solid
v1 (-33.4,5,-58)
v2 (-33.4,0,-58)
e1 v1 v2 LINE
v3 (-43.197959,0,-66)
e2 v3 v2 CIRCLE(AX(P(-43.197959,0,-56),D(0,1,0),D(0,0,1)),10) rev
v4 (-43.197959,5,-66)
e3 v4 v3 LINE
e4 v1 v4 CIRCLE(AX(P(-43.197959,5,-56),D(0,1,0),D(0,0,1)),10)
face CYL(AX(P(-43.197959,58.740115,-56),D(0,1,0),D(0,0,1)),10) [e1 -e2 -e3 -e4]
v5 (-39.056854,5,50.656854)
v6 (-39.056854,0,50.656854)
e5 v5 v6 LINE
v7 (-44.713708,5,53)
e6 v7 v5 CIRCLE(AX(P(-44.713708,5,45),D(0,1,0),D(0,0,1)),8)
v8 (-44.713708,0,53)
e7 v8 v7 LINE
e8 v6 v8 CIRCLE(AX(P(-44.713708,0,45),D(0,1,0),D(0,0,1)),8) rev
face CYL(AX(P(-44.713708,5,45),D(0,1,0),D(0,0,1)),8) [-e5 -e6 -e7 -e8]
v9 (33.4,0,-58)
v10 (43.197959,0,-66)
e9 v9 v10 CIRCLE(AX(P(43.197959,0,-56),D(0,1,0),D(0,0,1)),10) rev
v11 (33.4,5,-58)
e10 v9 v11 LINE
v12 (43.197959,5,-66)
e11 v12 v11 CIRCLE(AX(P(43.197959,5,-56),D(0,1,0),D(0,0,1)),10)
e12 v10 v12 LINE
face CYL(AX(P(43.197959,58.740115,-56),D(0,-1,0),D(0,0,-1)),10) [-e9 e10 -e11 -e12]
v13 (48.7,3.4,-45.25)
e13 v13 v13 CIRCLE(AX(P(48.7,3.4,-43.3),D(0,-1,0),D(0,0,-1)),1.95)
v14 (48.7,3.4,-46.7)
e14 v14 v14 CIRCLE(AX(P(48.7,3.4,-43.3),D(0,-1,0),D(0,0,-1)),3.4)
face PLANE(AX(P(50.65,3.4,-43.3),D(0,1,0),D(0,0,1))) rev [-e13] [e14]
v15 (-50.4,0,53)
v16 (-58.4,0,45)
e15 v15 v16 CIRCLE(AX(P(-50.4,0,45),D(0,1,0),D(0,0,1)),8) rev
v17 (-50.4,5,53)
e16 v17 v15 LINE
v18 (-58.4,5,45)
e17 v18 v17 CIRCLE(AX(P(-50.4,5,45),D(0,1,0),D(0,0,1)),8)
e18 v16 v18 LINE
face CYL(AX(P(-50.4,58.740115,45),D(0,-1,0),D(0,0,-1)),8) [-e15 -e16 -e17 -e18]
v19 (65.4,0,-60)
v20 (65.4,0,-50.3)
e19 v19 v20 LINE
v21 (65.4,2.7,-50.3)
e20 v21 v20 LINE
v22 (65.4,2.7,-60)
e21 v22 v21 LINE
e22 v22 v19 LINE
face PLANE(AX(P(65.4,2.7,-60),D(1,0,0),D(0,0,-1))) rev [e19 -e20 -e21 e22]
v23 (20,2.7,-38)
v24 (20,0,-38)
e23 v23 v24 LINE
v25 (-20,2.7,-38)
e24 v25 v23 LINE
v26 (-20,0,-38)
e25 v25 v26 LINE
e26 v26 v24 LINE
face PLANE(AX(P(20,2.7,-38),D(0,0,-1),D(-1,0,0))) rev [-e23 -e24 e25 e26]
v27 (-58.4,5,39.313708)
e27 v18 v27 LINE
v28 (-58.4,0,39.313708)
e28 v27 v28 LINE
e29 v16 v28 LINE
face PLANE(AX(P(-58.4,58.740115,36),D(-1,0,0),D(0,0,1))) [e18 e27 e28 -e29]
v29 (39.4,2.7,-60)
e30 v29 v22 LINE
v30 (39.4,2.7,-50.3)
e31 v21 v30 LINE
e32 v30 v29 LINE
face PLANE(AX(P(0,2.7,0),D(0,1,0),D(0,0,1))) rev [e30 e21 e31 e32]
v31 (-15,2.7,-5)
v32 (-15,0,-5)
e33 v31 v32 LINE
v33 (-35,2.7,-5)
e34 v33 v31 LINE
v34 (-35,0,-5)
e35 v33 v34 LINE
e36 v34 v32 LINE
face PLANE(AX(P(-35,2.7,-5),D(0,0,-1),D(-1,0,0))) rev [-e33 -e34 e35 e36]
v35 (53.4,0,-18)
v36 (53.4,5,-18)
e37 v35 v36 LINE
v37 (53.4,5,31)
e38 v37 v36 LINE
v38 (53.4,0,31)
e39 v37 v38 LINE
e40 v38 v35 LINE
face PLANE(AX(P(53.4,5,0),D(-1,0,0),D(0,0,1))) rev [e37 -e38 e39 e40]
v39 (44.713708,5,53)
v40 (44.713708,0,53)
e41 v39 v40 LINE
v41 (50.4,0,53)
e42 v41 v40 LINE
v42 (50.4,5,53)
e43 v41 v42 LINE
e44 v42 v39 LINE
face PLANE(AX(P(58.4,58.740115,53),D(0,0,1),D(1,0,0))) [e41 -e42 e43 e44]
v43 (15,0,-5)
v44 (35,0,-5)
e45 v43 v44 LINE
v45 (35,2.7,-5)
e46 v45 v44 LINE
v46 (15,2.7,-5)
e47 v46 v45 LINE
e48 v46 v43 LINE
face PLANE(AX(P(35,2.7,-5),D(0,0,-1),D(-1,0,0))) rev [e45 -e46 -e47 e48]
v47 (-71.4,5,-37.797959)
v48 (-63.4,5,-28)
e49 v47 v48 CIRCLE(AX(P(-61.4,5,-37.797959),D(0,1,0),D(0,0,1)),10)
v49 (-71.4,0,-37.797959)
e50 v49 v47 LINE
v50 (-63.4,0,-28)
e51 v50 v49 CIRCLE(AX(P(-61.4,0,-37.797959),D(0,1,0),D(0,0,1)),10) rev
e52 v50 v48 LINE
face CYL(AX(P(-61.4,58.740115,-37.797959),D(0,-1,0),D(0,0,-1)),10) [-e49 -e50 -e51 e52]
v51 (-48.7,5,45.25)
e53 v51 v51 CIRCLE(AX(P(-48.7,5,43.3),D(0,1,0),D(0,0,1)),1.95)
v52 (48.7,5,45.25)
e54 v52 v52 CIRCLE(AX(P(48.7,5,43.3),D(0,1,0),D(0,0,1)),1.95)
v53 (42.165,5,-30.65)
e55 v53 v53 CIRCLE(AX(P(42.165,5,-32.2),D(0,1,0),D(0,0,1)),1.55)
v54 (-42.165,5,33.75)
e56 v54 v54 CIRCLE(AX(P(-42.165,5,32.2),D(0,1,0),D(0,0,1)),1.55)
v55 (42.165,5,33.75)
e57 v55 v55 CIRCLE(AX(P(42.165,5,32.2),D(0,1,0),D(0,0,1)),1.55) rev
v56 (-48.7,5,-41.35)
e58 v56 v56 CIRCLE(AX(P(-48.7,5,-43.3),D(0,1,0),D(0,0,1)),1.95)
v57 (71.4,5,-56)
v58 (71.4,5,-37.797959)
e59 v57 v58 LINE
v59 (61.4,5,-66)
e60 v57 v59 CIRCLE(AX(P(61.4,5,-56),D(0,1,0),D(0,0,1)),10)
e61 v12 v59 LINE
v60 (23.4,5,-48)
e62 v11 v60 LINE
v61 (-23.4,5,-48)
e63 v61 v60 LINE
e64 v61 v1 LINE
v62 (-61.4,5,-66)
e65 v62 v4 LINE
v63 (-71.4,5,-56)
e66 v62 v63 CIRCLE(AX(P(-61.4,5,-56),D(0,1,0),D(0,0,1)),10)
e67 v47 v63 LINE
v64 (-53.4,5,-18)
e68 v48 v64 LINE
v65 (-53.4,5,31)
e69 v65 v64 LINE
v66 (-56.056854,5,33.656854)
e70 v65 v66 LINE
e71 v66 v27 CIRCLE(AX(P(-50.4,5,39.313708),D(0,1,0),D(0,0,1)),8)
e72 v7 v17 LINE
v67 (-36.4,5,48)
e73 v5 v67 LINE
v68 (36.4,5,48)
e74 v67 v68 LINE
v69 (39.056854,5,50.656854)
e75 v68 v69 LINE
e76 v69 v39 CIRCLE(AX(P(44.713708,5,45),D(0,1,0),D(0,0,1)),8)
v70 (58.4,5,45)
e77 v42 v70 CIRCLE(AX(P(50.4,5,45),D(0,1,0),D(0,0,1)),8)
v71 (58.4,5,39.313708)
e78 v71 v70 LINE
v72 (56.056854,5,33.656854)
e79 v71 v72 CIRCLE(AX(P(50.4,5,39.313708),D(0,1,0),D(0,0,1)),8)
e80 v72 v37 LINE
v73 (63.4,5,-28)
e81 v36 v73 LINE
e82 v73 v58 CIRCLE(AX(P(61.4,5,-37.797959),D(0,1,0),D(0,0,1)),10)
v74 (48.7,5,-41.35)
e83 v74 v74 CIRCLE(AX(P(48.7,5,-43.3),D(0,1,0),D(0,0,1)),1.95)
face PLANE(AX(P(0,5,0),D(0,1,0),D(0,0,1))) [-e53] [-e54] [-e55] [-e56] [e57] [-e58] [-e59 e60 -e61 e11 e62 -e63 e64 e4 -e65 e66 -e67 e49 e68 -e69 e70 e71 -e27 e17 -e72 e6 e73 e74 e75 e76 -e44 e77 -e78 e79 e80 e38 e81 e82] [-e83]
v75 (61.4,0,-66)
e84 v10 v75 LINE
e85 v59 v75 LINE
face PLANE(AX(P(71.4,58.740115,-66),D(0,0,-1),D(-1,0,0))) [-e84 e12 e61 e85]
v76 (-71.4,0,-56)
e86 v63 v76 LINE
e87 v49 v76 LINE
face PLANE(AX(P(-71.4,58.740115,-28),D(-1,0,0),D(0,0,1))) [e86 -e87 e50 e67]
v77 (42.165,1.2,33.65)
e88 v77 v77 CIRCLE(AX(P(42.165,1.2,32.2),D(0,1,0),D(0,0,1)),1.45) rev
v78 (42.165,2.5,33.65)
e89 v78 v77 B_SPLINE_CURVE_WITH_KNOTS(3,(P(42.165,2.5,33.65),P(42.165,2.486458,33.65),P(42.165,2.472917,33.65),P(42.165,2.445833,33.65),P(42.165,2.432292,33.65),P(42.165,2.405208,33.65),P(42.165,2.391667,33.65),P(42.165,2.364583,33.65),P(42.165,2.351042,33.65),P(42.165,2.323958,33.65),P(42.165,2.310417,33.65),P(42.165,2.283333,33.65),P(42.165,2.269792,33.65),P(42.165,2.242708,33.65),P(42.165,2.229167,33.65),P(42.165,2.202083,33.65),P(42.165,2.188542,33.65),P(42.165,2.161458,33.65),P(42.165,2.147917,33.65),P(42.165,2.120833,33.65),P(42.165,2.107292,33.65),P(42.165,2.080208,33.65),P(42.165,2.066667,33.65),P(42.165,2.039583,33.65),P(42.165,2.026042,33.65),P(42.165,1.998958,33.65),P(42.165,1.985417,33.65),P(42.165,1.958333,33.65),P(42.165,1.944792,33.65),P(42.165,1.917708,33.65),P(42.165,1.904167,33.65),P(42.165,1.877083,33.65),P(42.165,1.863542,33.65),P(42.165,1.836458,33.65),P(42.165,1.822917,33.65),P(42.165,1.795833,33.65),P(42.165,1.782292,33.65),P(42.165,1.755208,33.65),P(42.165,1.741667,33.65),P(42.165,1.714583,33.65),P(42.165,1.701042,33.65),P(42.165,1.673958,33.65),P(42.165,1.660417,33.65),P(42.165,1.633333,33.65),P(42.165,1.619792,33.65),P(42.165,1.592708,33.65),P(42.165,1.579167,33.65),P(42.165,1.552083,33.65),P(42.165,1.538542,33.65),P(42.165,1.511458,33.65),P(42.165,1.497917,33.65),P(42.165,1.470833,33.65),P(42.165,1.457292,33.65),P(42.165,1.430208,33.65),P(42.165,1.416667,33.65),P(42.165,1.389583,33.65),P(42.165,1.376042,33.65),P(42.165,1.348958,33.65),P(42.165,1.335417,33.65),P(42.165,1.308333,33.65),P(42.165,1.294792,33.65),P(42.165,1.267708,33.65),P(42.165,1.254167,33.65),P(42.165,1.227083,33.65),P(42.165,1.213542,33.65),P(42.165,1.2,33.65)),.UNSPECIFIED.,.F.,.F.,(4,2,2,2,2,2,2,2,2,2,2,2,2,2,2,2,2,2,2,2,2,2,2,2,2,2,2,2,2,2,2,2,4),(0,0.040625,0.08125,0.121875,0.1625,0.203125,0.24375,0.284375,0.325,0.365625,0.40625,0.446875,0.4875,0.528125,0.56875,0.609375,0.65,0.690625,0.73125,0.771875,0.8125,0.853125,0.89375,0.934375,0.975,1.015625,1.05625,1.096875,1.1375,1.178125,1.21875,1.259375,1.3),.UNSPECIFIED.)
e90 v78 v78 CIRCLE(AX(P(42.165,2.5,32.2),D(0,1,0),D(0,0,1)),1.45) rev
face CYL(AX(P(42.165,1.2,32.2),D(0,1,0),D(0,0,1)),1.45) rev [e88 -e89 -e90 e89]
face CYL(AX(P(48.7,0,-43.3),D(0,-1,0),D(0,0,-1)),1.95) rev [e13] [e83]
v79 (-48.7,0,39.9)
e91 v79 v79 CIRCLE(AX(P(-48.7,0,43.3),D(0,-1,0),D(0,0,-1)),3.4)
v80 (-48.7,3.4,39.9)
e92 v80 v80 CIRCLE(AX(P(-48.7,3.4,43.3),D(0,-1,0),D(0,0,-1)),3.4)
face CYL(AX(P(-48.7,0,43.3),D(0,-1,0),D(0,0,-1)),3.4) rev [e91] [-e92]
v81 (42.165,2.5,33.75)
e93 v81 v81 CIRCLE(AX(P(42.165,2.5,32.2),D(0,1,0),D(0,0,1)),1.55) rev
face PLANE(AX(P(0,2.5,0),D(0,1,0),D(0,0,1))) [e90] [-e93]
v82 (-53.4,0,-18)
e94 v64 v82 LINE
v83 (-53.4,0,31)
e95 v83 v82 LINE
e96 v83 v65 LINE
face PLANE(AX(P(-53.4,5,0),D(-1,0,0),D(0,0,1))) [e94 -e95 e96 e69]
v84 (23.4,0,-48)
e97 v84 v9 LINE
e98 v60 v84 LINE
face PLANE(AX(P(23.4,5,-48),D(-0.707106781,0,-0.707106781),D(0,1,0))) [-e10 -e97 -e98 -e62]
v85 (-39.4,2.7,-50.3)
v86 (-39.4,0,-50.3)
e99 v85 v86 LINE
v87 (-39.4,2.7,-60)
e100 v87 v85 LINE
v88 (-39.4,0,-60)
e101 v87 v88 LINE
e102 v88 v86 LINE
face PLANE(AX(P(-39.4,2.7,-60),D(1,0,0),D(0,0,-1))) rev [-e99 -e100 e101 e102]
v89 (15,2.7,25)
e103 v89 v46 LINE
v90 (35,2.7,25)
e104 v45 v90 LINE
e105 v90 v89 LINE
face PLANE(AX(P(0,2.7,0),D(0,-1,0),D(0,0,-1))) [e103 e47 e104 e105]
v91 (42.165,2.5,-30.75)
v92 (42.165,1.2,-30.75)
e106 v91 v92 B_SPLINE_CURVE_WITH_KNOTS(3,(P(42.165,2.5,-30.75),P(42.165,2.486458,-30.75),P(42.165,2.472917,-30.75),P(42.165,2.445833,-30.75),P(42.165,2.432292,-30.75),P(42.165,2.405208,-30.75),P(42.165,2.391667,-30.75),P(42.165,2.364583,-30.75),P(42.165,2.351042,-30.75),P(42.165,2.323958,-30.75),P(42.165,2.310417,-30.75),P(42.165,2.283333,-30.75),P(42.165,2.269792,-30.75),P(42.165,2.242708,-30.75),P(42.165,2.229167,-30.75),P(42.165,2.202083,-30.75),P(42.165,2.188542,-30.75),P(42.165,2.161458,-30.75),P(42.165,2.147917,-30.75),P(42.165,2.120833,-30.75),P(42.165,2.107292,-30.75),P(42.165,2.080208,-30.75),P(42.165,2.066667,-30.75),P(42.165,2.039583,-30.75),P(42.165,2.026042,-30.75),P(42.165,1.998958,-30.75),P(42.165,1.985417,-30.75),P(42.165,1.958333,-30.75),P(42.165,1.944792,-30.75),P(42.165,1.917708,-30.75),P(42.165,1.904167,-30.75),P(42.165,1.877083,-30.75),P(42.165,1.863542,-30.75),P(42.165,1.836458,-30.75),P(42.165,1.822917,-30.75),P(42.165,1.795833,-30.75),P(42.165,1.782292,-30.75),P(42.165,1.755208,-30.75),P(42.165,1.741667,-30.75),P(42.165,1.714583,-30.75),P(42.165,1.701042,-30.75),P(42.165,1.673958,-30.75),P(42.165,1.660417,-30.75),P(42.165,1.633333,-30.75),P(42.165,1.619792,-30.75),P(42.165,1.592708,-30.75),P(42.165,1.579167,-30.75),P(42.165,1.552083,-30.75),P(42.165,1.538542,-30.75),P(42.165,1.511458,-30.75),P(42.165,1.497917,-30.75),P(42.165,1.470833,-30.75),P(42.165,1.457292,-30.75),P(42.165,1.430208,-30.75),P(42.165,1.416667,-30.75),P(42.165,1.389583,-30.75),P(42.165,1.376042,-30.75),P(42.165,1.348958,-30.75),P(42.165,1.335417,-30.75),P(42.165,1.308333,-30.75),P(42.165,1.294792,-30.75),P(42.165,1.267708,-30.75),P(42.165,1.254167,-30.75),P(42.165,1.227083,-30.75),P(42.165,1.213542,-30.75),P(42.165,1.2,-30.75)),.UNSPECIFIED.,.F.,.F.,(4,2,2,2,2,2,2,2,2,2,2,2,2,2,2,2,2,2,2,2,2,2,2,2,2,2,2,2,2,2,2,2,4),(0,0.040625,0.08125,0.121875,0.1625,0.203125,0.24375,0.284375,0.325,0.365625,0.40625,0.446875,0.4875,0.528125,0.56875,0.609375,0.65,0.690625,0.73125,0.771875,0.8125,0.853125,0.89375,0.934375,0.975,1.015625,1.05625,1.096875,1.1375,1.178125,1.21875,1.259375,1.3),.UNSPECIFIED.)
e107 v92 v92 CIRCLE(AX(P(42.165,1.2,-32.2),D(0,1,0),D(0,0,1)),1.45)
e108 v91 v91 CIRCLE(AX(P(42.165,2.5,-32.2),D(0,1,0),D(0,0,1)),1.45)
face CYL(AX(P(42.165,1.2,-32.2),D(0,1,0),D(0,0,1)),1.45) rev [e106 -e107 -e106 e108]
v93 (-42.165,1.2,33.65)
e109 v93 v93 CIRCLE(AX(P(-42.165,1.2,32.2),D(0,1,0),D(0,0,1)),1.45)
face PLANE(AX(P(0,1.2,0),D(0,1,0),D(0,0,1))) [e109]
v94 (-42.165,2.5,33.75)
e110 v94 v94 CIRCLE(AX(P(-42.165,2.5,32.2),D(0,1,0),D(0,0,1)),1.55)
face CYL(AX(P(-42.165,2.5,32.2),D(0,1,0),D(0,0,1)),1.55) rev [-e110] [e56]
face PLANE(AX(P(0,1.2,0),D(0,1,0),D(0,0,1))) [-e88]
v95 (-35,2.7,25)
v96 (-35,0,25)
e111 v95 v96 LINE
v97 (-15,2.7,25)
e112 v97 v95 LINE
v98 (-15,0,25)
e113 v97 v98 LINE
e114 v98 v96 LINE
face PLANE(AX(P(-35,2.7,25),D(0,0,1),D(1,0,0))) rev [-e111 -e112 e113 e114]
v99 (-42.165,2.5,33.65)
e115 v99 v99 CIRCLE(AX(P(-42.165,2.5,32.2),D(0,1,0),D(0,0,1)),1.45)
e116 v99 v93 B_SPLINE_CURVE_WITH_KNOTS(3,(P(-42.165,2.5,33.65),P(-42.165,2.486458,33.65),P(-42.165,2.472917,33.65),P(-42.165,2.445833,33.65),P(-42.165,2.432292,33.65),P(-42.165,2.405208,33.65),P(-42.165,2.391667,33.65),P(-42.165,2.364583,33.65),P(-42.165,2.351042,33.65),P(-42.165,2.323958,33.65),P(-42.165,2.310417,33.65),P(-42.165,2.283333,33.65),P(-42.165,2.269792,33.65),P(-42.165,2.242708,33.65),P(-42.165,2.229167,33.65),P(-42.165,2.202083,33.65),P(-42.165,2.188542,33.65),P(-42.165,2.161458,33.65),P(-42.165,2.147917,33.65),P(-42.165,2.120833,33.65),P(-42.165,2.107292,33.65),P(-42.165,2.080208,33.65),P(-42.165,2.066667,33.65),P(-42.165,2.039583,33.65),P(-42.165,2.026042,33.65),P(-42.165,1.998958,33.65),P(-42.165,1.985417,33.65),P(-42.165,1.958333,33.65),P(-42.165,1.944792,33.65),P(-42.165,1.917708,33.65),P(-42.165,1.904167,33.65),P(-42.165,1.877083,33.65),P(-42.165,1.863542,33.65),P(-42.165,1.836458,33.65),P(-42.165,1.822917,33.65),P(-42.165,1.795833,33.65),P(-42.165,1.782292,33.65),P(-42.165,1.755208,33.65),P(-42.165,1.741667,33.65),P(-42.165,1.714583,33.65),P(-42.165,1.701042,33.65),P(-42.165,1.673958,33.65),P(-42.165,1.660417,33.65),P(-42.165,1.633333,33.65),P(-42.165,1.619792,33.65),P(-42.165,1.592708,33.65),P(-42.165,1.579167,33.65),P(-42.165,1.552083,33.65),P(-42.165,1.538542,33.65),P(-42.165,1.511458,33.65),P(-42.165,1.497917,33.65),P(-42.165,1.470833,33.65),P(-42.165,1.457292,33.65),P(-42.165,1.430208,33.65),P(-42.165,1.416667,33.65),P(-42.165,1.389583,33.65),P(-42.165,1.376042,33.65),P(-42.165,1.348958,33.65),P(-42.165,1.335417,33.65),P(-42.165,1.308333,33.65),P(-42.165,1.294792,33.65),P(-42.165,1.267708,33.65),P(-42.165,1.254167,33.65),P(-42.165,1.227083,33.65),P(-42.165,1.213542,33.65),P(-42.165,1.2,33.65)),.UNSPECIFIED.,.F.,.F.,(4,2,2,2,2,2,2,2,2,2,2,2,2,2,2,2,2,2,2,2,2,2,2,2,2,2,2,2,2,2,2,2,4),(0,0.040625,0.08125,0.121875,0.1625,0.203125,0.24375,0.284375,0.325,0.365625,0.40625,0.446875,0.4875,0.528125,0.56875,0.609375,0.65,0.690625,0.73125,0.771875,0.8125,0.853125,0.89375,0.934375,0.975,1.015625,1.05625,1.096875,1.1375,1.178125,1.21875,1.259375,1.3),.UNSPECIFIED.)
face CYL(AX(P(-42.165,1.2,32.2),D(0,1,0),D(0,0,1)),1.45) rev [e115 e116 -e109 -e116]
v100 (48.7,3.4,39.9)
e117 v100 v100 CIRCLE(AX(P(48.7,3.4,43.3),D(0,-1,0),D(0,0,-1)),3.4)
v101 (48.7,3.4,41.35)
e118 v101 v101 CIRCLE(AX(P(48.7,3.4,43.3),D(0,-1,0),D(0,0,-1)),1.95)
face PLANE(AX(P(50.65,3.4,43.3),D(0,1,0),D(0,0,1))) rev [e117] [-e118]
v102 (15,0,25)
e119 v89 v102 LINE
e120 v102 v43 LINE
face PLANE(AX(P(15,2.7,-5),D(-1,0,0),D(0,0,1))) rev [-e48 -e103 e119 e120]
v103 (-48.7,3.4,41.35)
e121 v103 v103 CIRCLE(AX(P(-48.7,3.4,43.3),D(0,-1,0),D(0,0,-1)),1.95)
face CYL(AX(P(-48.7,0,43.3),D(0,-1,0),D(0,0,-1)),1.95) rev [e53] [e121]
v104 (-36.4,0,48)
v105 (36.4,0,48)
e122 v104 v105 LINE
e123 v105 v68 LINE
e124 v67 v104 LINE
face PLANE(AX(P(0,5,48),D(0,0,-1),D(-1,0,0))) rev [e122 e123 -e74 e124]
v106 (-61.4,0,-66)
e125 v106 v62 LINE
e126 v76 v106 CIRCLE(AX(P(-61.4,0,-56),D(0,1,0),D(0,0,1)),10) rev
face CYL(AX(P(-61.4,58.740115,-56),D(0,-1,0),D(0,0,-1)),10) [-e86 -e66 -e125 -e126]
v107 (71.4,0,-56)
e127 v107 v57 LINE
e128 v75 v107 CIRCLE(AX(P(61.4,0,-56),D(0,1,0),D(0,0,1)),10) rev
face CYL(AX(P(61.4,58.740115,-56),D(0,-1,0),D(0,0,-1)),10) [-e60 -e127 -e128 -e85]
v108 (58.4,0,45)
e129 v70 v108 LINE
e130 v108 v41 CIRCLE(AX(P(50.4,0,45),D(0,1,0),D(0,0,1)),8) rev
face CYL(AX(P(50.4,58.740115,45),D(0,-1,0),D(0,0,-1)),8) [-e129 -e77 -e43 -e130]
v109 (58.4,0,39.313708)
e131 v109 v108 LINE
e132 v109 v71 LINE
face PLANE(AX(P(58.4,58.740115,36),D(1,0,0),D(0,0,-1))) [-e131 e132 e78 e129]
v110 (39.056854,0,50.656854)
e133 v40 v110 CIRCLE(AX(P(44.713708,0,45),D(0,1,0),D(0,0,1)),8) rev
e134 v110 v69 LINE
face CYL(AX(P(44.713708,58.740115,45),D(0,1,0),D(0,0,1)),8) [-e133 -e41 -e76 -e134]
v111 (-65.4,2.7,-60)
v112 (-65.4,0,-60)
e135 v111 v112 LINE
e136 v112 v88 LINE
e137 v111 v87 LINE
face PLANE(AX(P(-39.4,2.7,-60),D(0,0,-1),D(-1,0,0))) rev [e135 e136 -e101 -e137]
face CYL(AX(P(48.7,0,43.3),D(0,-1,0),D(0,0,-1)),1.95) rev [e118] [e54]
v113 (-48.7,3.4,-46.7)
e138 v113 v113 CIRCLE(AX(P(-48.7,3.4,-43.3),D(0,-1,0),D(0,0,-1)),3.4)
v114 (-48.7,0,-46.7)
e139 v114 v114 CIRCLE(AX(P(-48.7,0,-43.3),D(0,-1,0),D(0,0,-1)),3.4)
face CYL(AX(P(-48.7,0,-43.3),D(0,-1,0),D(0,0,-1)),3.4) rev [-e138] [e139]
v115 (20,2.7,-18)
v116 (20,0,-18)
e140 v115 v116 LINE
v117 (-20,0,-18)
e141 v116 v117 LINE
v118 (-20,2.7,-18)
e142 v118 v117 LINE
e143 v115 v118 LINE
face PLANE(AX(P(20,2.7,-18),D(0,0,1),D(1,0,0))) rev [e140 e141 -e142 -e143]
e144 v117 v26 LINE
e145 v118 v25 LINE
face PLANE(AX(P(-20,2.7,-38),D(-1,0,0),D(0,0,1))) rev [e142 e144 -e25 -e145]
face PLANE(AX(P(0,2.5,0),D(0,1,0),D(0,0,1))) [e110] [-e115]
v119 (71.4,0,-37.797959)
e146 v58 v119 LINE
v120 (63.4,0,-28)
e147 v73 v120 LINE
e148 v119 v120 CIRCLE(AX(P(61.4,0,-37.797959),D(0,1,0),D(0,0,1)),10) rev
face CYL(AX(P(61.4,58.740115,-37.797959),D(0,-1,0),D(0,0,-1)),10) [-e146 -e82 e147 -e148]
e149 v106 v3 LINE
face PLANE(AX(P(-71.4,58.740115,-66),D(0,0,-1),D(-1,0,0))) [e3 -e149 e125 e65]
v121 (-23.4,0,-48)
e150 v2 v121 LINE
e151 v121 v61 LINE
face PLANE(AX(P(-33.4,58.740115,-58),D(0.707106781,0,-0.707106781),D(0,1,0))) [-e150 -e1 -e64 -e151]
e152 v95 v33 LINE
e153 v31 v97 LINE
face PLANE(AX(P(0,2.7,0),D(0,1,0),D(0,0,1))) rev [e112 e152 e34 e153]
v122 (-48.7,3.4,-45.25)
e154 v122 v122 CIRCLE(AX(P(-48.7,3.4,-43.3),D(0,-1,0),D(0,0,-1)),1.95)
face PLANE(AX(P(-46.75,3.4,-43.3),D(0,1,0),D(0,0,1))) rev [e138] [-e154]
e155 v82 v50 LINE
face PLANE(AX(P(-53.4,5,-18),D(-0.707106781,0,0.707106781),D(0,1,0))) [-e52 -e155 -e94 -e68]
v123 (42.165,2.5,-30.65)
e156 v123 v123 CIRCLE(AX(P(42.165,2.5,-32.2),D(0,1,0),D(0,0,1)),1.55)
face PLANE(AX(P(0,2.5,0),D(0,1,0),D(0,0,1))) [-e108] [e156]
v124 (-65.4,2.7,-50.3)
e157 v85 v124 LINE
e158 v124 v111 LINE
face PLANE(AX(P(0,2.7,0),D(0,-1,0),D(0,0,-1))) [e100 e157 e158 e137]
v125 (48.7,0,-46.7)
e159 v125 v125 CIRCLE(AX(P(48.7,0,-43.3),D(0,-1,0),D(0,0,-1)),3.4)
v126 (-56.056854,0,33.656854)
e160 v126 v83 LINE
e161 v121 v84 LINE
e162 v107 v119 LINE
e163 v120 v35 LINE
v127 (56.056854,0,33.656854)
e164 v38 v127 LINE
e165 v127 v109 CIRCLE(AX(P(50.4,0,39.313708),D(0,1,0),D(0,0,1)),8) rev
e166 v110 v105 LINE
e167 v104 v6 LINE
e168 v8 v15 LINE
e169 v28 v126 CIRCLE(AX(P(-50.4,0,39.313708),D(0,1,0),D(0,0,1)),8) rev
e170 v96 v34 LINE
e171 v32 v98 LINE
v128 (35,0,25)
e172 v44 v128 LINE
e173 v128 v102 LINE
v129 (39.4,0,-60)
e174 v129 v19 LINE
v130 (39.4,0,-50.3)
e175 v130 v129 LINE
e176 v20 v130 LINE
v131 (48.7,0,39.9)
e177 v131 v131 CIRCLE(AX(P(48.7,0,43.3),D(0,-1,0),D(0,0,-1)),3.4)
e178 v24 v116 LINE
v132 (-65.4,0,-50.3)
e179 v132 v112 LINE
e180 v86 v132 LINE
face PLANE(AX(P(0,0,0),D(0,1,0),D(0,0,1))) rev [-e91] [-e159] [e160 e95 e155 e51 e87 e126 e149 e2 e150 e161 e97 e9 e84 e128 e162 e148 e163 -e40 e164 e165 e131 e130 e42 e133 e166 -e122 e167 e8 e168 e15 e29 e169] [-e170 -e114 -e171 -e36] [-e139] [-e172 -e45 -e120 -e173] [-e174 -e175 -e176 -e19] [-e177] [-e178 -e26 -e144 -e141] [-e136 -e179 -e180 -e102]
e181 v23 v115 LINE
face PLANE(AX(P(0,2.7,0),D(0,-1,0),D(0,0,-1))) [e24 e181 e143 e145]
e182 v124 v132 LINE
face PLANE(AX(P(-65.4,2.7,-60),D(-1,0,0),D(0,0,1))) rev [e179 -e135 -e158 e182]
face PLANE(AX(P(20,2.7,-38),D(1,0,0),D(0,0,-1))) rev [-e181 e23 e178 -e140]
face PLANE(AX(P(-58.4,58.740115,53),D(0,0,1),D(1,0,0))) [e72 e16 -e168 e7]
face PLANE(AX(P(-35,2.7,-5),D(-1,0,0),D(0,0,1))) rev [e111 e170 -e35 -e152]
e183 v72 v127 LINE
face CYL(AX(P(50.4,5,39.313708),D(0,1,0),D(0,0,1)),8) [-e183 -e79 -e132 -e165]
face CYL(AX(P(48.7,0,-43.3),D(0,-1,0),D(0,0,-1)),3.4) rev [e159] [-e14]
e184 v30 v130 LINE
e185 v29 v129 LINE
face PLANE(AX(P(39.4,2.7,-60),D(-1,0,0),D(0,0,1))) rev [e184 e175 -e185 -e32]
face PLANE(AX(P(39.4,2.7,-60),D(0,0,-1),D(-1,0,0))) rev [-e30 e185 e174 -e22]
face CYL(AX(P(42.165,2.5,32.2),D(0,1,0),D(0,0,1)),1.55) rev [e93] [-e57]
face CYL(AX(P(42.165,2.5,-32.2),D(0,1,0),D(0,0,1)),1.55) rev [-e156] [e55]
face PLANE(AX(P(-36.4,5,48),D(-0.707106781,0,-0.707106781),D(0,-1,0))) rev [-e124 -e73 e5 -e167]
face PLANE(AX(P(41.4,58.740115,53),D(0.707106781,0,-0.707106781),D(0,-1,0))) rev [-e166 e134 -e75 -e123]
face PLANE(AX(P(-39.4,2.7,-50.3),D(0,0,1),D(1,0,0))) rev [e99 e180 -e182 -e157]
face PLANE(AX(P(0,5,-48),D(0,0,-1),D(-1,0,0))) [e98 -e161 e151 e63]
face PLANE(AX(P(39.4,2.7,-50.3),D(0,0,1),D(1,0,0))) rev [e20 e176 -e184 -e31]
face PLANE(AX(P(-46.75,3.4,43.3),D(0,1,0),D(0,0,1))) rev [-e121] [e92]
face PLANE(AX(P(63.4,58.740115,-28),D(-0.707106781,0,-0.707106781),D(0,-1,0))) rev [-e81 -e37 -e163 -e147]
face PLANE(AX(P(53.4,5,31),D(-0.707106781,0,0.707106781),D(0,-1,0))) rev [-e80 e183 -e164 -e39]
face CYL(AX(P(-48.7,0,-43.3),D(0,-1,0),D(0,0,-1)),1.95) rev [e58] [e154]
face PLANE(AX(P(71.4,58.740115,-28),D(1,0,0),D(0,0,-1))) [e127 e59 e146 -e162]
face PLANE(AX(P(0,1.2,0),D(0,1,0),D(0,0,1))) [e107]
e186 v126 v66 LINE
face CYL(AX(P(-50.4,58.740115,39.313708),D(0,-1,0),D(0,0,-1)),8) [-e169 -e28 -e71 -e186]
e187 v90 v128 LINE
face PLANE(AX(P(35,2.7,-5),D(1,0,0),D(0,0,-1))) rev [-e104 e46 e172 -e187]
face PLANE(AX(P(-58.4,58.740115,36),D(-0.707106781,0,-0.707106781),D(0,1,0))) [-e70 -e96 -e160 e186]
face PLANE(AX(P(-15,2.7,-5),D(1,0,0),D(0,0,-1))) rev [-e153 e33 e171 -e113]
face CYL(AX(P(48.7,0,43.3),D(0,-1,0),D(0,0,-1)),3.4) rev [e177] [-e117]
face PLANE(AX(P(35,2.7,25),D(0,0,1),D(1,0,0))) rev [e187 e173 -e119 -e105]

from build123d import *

# Parameters (mm, degrees)
SKETCH1_W                                       = 106.8
SKETCH1_H                                       = 96
SKETCH1_W_2                                     = 100.8
SKETCH1_H_2                                     = 90
BASE_DEPTH                                      = 5
BOSS_EXTRUDE1_DEPTH                             = 5
CHAMFER1_SIZE                                   = 10
FILLET1_R                                       = 10
CHAMFER4_SIZE                                   = 5
FILLET2_START                                   = -1
FILLET2_DEPTH                                   = 7
CBORE_FOR_M3_SOCKET_HEAD_CAP_SCREW1_D           = 3.9
CBORE_FOR_M3_SOCKET_HEAD_CAP_SCREW1_CBORE_D     = 6.8
CBORE_FOR_M3_SOCKET_HEAD_CAP_SCREW1_CBORE_DEPTH = 3.4
SKETCH8_W                                       = 20
SKETCH8_H                                       = 30
SKETCH8_W_2                                     = 40
SKETCH8_H_2                                     = 20
SKETCH8_W_3                                     = 26
SKETCH8_H_3                                     = 9.7
CUT_EXTRUDE1_DEPTH                              = 2.7
CUT_EXTRUDE2_START                              = 2.5
CUT_EXTRUDE2_OUTLINE_R                          = 1.55
CUT_EXTRUDE2_OUTLINE_R_2                        = 1.45
CUT_EXTRUDE2_DEPTH                              = 3.5
CUT_EXTRUDE3_START                              = -3.8
SKETCH9_3_R                                     = 1.45
CUT_EXTRUDE3_DEPTH                              = 3.8


with BuildPart() as part:
    # Sketch1 → Base (new body)
    # profile 1 of 2: a face of its own
    with BuildSketch(Plane(origin=(0, 0, 0), x_dir=(1, 0, 0), z_dir=(0, 1, 0))):
        Rectangle(SKETCH1_W, SKETCH1_H)
        Rectangle(SKETCH1_W_2, SKETCH1_H_2, mode=Mode.SUBTRACT)
    # profile 2 of 2: a face of its own
    with BuildSketch(Plane(origin=(0, 0, 0), x_dir=(1, 0, 0), z_dir=(0, 1, 0))):
        Rectangle(SKETCH1_W_2, SKETCH1_H_2)
    extrude(amount=BASE_DEPTH)

    # Sketch7 → Boss-Extrude1 (add)
    with BuildSketch(Plane.XZ):
        Polygon((53.4, -28), (71.4, -28), (71.4, -66), (33.4, -66), (33.4, -48), (53.4, -48), align=None)
        Polygon((-33.4, -48), (-53.4, -48), (-53.4, -28), (-71.4, -28), (-71.4, -66), (-33.4, -66), align=None)
        Polygon((-53.4, 36), (-58.4, 36), (-58.4, 53), (-41.4, 53), (-41.4, 48), (-53.4, 48), align=None)
        Polygon((41.4, 48), (53.4, 48), (53.4, 36), (58.4, 36), (58.4, 53), (41.4, 53), align=None)
    extrude(amount=-BOSS_EXTRUDE1_DEPTH)

    # Chamfer1
    chamfer1_edges = [part.edges().sort_by_distance(p)[0] for p in [
        (33.4, 2.5, -48),
        (53.4, 2.5, -28),
        (-53.4, 2.5, -28),
        (-33.4, 2.5, -48),
    ]]
    chamfer(chamfer1_edges, length=CHAMFER1_SIZE)

    # Fillet1
    # the kernel refuses this fillet: 10 mm, written as the material it takes off along each edge
    with BuildSketch(Plane(origin=(-71.4, -24.494897428, -28), x_dir=(1, 0, 0), z_dir=(0, 1, 0)), Plane(origin=(33.4, -24.494897428, -66), x_dir=(0, 0, 1), z_dir=(0, 1, 0))) as fillet1_piece_1:
        with BuildLine():
            CenterArc((10, 9.797958971), FILLET1_R, 180, 78.463040967)
            Line((0, 9.797958971), (-0.2, 9.797958971))
            Line((-0.2, 9.797958971), (-0.2, 0))
            Line((-0.2, 0), (0, -0.2))
            ThreePointArc((0, -0.2), (4, -0.2), (7.96, -0.195959179))
            Line((7.96, -0.195959179), (8, 0))
        make_face()
    extrude(amount=53.989794856, mode=Mode.SUBTRACT)
    with BuildSketch(Plane(origin=(-71.4, -25, -66), x_dir=(0, 0, 1), z_dir=(0, 1, 0)), Plane(origin=(71.4, -25, -66), x_dir=(-1, 0, 0), z_dir=(0, 1, 0))) as fillet1_piece_2:
        with BuildLine():
            CenterArc((FILLET1_R, FILLET1_R), FILLET1_R, 180, 90)
            Line((0, FILLET1_R), (-FILLET1_R * 0.02, FILLET1_R))
            Line((-FILLET1_R * 0.02, FILLET1_R), (-FILLET1_R * 0.02, -FILLET1_R * 0.02))
            Line((-FILLET1_R * 0.02, -FILLET1_R * 0.02), (FILLET1_R, -FILLET1_R * 0.02))
            Line((FILLET1_R, -FILLET1_R * 0.02), (FILLET1_R, 0))
        make_face()
    extrude(amount=55, mode=Mode.SUBTRACT)
    with BuildSketch(Plane(origin=(-33.4, -24.494897428, -66), x_dir=(-1, 0, 0), z_dir=(0, 1, 0)), Plane(origin=(71.4, -24.494897428, -28), x_dir=(0, 0, -1), z_dir=(0, 1, 0))) as fillet1_piece_3:
        with BuildLine():
            CenterArc((9.797958971, 10), FILLET1_R, 191.536959033, 78.463040967)
            Line((0, 8), (-0.195959179, 7.96))
            ThreePointArc((-0.195959179, 7.96), (-0.2, 4), (-0.2, 0))
            Line((-0.2, 0), (0, -0.2))
            Line((0, -0.2), (9.797958971, -0.2))
            Line((9.797958971, -0.2), (9.797958971, 0))
        make_face()
    extrude(amount=53.989794856, mode=Mode.SUBTRACT)

    # Chamfer4
    chamfer4_edges = [part.edges().sort_by_distance(p)[0] for p in [
        (41.4, 2.5, 48),
        (53.4, 2.5, 36),
        (-41.4, 2.5, 48),
        (-53.4, 2.5, 36),
    ]]
    chamfer(chamfer4_edges, length=CHAMFER4_SIZE - 0.0001)  # a hair under: the kernel refuses the full size

    # Fillet2: read off the stored shape, not the designer's step
    # Fillet2 outline → Fillet2 (cut)
    with BuildSketch(Plane(origin=(0, 0, 0), x_dir=(1, 0, 0), z_dir=(0, 1, 0)).offset(FILLET2_START)):
        with BuildLine():
            ThreePointArc((56.056854249, -33.656854249), (57.79103626, -36.25224104), (58.4, -39.313708499))
            Line((58.4, -39.313708499), (58.4, -36))
            Line((58.4, -36), (56.056854249, -33.656854249))
        make_face()
        with BuildLine():
            ThreePointArc((58.4, -45), (56.056854249, -50.656854249), (50.4, -53))
            Line((50.4, -53), (58.4, -53))
            Line((58.4, -53), (58.4, -45))
        make_face()
        with BuildLine():
            ThreePointArc((44.713708499, -53), (41.65224104, -52.39103626), (39.056854249, -50.656854249))
            Line((39.056854249, -50.656854249), (41.4, -53))
            Line((41.4, -53), (44.713708499, -53))
        make_face()
        with BuildLine():
            Line((-58.4, -36), (-58.4, -39.313708499))
            ThreePointArc((-58.4, -39.313708499), (-57.79103626, -36.25224104), (-56.056854249, -33.656854249))
            Line((-56.056854249, -33.656854249), (-58.4, -36))
        make_face()
        with BuildLine():
            ThreePointArc((-39.056854249, -50.656854249), (-41.65224104, -52.39103626), (-44.713708499, -53))
            Line((-44.713708499, -53), (-41.4, -53))
            Line((-41.4, -53), (-39.056854249, -50.656854249))
        make_face()
        with BuildLine():
            ThreePointArc((-50.4, -53), (-56.056854249, -50.656854249), (-58.4, -45))
            Line((-58.4, -45), (-58.4, -53))
            Line((-58.4, -53), (-50.4, -53))
        make_face()
    extrude(amount=FILLET2_DEPTH, mode=Mode.SUBTRACT)

    # CBORE for M3 Socket Head Cap Screw1 (through all)
    with Locations(Plane(origin=(0, 0, 0), x_dir=(-1, 0, 0), z_dir=(0, -1, 0))):
        with Locations((-48.7, 43.3), (-48.7, -43.3), (48.7, 43.3), (48.7, -43.3)):
            CounterBoreHole(CBORE_FOR_M3_SOCKET_HEAD_CAP_SCREW1_D / 2, CBORE_FOR_M3_SOCKET_HEAD_CAP_SCREW1_CBORE_D / 2, CBORE_FOR_M3_SOCKET_HEAD_CAP_SCREW1_CBORE_DEPTH)

    # Sketch8 → Cut-Extrude1 (cut)
    with BuildSketch(Plane.XZ):
        with Locations((-25, 10)):
            Rectangle(SKETCH8_W, SKETCH8_H)
        with Locations((25, 10)):
            Rectangle(SKETCH8_W, SKETCH8_H)
        with Locations((0, -28)):
            Rectangle(SKETCH8_W_2, SKETCH8_H_2)
        with Locations((-52.4, -55.15)):
            Rectangle(SKETCH8_W_3, SKETCH8_H_3)
        with Locations((52.4, -55.15)):
            Rectangle(SKETCH8_W_3, SKETCH8_H_3)
    extrude(amount=-CUT_EXTRUDE1_DEPTH, mode=Mode.SUBTRACT)

    # Cut-Extrude2: read off the stored shape, not the designer's step
    # Cut-Extrude2 outline → Cut-Extrude2 (cut)
    # profile 1 of 3: a face of its own
    with BuildSketch(Plane(origin=(0, 0, 0), x_dir=(1, 0, 0), z_dir=(0, 1, 0)).offset(CUT_EXTRUDE2_START)):
        with Locations((42.165, 32.2)):
            Circle(CUT_EXTRUDE2_OUTLINE_R)
        with Locations((42.165, 32.2)):
            Circle(CUT_EXTRUDE2_OUTLINE_R_2, mode=Mode.SUBTRACT)
    # profile 2 of 3: a face of its own
    with BuildSketch(Plane(origin=(0, 0, 0), x_dir=(1, 0, 0), z_dir=(0, 1, 0)).offset(CUT_EXTRUDE2_START)):
        with Locations((42.165, -32.2)):
            Circle(CUT_EXTRUDE2_OUTLINE_R)
        with Locations((42.165, -32.2)):
            Circle(CUT_EXTRUDE2_OUTLINE_R_2, mode=Mode.SUBTRACT)
    # profile 3 of 3: a face of its own
    with BuildSketch(Plane(origin=(0, 0, 0), x_dir=(1, 0, 0), z_dir=(0, 1, 0)).offset(CUT_EXTRUDE2_START)):
        with Locations((-42.165, -32.2)):
            Circle(CUT_EXTRUDE2_OUTLINE_R)
        with Locations((-42.165, -32.2)):
            Circle(CUT_EXTRUDE2_OUTLINE_R_2, mode=Mode.SUBTRACT)
    extrude(amount=CUT_EXTRUDE2_DEPTH, mode=Mode.SUBTRACT)

    # Sketch9<3> → Cut-Extrude3 (cut)
    with BuildSketch(Plane(origin=(0, 5, 0), x_dir=(1, 0, 0), z_dir=(0, 1, 0)).offset(CUT_EXTRUDE3_START)):
        with Locations(Location((-42.165, -32.2, 0), (0, 0, 270))):
            Circle(SKETCH9_3_R)
        with Locations(Location((42.165, -32.2, 0), (0, 0, 270))):
            Circle(SKETCH9_3_R)
        with Locations(Location((42.165, 32.2, 0), (0, 0, 270))):
            Circle(SKETCH9_3_R)
    extrude(amount=CUT_EXTRUDE3_DEPTH, mode=Mode.SUBTRACT)


solid = part.part
